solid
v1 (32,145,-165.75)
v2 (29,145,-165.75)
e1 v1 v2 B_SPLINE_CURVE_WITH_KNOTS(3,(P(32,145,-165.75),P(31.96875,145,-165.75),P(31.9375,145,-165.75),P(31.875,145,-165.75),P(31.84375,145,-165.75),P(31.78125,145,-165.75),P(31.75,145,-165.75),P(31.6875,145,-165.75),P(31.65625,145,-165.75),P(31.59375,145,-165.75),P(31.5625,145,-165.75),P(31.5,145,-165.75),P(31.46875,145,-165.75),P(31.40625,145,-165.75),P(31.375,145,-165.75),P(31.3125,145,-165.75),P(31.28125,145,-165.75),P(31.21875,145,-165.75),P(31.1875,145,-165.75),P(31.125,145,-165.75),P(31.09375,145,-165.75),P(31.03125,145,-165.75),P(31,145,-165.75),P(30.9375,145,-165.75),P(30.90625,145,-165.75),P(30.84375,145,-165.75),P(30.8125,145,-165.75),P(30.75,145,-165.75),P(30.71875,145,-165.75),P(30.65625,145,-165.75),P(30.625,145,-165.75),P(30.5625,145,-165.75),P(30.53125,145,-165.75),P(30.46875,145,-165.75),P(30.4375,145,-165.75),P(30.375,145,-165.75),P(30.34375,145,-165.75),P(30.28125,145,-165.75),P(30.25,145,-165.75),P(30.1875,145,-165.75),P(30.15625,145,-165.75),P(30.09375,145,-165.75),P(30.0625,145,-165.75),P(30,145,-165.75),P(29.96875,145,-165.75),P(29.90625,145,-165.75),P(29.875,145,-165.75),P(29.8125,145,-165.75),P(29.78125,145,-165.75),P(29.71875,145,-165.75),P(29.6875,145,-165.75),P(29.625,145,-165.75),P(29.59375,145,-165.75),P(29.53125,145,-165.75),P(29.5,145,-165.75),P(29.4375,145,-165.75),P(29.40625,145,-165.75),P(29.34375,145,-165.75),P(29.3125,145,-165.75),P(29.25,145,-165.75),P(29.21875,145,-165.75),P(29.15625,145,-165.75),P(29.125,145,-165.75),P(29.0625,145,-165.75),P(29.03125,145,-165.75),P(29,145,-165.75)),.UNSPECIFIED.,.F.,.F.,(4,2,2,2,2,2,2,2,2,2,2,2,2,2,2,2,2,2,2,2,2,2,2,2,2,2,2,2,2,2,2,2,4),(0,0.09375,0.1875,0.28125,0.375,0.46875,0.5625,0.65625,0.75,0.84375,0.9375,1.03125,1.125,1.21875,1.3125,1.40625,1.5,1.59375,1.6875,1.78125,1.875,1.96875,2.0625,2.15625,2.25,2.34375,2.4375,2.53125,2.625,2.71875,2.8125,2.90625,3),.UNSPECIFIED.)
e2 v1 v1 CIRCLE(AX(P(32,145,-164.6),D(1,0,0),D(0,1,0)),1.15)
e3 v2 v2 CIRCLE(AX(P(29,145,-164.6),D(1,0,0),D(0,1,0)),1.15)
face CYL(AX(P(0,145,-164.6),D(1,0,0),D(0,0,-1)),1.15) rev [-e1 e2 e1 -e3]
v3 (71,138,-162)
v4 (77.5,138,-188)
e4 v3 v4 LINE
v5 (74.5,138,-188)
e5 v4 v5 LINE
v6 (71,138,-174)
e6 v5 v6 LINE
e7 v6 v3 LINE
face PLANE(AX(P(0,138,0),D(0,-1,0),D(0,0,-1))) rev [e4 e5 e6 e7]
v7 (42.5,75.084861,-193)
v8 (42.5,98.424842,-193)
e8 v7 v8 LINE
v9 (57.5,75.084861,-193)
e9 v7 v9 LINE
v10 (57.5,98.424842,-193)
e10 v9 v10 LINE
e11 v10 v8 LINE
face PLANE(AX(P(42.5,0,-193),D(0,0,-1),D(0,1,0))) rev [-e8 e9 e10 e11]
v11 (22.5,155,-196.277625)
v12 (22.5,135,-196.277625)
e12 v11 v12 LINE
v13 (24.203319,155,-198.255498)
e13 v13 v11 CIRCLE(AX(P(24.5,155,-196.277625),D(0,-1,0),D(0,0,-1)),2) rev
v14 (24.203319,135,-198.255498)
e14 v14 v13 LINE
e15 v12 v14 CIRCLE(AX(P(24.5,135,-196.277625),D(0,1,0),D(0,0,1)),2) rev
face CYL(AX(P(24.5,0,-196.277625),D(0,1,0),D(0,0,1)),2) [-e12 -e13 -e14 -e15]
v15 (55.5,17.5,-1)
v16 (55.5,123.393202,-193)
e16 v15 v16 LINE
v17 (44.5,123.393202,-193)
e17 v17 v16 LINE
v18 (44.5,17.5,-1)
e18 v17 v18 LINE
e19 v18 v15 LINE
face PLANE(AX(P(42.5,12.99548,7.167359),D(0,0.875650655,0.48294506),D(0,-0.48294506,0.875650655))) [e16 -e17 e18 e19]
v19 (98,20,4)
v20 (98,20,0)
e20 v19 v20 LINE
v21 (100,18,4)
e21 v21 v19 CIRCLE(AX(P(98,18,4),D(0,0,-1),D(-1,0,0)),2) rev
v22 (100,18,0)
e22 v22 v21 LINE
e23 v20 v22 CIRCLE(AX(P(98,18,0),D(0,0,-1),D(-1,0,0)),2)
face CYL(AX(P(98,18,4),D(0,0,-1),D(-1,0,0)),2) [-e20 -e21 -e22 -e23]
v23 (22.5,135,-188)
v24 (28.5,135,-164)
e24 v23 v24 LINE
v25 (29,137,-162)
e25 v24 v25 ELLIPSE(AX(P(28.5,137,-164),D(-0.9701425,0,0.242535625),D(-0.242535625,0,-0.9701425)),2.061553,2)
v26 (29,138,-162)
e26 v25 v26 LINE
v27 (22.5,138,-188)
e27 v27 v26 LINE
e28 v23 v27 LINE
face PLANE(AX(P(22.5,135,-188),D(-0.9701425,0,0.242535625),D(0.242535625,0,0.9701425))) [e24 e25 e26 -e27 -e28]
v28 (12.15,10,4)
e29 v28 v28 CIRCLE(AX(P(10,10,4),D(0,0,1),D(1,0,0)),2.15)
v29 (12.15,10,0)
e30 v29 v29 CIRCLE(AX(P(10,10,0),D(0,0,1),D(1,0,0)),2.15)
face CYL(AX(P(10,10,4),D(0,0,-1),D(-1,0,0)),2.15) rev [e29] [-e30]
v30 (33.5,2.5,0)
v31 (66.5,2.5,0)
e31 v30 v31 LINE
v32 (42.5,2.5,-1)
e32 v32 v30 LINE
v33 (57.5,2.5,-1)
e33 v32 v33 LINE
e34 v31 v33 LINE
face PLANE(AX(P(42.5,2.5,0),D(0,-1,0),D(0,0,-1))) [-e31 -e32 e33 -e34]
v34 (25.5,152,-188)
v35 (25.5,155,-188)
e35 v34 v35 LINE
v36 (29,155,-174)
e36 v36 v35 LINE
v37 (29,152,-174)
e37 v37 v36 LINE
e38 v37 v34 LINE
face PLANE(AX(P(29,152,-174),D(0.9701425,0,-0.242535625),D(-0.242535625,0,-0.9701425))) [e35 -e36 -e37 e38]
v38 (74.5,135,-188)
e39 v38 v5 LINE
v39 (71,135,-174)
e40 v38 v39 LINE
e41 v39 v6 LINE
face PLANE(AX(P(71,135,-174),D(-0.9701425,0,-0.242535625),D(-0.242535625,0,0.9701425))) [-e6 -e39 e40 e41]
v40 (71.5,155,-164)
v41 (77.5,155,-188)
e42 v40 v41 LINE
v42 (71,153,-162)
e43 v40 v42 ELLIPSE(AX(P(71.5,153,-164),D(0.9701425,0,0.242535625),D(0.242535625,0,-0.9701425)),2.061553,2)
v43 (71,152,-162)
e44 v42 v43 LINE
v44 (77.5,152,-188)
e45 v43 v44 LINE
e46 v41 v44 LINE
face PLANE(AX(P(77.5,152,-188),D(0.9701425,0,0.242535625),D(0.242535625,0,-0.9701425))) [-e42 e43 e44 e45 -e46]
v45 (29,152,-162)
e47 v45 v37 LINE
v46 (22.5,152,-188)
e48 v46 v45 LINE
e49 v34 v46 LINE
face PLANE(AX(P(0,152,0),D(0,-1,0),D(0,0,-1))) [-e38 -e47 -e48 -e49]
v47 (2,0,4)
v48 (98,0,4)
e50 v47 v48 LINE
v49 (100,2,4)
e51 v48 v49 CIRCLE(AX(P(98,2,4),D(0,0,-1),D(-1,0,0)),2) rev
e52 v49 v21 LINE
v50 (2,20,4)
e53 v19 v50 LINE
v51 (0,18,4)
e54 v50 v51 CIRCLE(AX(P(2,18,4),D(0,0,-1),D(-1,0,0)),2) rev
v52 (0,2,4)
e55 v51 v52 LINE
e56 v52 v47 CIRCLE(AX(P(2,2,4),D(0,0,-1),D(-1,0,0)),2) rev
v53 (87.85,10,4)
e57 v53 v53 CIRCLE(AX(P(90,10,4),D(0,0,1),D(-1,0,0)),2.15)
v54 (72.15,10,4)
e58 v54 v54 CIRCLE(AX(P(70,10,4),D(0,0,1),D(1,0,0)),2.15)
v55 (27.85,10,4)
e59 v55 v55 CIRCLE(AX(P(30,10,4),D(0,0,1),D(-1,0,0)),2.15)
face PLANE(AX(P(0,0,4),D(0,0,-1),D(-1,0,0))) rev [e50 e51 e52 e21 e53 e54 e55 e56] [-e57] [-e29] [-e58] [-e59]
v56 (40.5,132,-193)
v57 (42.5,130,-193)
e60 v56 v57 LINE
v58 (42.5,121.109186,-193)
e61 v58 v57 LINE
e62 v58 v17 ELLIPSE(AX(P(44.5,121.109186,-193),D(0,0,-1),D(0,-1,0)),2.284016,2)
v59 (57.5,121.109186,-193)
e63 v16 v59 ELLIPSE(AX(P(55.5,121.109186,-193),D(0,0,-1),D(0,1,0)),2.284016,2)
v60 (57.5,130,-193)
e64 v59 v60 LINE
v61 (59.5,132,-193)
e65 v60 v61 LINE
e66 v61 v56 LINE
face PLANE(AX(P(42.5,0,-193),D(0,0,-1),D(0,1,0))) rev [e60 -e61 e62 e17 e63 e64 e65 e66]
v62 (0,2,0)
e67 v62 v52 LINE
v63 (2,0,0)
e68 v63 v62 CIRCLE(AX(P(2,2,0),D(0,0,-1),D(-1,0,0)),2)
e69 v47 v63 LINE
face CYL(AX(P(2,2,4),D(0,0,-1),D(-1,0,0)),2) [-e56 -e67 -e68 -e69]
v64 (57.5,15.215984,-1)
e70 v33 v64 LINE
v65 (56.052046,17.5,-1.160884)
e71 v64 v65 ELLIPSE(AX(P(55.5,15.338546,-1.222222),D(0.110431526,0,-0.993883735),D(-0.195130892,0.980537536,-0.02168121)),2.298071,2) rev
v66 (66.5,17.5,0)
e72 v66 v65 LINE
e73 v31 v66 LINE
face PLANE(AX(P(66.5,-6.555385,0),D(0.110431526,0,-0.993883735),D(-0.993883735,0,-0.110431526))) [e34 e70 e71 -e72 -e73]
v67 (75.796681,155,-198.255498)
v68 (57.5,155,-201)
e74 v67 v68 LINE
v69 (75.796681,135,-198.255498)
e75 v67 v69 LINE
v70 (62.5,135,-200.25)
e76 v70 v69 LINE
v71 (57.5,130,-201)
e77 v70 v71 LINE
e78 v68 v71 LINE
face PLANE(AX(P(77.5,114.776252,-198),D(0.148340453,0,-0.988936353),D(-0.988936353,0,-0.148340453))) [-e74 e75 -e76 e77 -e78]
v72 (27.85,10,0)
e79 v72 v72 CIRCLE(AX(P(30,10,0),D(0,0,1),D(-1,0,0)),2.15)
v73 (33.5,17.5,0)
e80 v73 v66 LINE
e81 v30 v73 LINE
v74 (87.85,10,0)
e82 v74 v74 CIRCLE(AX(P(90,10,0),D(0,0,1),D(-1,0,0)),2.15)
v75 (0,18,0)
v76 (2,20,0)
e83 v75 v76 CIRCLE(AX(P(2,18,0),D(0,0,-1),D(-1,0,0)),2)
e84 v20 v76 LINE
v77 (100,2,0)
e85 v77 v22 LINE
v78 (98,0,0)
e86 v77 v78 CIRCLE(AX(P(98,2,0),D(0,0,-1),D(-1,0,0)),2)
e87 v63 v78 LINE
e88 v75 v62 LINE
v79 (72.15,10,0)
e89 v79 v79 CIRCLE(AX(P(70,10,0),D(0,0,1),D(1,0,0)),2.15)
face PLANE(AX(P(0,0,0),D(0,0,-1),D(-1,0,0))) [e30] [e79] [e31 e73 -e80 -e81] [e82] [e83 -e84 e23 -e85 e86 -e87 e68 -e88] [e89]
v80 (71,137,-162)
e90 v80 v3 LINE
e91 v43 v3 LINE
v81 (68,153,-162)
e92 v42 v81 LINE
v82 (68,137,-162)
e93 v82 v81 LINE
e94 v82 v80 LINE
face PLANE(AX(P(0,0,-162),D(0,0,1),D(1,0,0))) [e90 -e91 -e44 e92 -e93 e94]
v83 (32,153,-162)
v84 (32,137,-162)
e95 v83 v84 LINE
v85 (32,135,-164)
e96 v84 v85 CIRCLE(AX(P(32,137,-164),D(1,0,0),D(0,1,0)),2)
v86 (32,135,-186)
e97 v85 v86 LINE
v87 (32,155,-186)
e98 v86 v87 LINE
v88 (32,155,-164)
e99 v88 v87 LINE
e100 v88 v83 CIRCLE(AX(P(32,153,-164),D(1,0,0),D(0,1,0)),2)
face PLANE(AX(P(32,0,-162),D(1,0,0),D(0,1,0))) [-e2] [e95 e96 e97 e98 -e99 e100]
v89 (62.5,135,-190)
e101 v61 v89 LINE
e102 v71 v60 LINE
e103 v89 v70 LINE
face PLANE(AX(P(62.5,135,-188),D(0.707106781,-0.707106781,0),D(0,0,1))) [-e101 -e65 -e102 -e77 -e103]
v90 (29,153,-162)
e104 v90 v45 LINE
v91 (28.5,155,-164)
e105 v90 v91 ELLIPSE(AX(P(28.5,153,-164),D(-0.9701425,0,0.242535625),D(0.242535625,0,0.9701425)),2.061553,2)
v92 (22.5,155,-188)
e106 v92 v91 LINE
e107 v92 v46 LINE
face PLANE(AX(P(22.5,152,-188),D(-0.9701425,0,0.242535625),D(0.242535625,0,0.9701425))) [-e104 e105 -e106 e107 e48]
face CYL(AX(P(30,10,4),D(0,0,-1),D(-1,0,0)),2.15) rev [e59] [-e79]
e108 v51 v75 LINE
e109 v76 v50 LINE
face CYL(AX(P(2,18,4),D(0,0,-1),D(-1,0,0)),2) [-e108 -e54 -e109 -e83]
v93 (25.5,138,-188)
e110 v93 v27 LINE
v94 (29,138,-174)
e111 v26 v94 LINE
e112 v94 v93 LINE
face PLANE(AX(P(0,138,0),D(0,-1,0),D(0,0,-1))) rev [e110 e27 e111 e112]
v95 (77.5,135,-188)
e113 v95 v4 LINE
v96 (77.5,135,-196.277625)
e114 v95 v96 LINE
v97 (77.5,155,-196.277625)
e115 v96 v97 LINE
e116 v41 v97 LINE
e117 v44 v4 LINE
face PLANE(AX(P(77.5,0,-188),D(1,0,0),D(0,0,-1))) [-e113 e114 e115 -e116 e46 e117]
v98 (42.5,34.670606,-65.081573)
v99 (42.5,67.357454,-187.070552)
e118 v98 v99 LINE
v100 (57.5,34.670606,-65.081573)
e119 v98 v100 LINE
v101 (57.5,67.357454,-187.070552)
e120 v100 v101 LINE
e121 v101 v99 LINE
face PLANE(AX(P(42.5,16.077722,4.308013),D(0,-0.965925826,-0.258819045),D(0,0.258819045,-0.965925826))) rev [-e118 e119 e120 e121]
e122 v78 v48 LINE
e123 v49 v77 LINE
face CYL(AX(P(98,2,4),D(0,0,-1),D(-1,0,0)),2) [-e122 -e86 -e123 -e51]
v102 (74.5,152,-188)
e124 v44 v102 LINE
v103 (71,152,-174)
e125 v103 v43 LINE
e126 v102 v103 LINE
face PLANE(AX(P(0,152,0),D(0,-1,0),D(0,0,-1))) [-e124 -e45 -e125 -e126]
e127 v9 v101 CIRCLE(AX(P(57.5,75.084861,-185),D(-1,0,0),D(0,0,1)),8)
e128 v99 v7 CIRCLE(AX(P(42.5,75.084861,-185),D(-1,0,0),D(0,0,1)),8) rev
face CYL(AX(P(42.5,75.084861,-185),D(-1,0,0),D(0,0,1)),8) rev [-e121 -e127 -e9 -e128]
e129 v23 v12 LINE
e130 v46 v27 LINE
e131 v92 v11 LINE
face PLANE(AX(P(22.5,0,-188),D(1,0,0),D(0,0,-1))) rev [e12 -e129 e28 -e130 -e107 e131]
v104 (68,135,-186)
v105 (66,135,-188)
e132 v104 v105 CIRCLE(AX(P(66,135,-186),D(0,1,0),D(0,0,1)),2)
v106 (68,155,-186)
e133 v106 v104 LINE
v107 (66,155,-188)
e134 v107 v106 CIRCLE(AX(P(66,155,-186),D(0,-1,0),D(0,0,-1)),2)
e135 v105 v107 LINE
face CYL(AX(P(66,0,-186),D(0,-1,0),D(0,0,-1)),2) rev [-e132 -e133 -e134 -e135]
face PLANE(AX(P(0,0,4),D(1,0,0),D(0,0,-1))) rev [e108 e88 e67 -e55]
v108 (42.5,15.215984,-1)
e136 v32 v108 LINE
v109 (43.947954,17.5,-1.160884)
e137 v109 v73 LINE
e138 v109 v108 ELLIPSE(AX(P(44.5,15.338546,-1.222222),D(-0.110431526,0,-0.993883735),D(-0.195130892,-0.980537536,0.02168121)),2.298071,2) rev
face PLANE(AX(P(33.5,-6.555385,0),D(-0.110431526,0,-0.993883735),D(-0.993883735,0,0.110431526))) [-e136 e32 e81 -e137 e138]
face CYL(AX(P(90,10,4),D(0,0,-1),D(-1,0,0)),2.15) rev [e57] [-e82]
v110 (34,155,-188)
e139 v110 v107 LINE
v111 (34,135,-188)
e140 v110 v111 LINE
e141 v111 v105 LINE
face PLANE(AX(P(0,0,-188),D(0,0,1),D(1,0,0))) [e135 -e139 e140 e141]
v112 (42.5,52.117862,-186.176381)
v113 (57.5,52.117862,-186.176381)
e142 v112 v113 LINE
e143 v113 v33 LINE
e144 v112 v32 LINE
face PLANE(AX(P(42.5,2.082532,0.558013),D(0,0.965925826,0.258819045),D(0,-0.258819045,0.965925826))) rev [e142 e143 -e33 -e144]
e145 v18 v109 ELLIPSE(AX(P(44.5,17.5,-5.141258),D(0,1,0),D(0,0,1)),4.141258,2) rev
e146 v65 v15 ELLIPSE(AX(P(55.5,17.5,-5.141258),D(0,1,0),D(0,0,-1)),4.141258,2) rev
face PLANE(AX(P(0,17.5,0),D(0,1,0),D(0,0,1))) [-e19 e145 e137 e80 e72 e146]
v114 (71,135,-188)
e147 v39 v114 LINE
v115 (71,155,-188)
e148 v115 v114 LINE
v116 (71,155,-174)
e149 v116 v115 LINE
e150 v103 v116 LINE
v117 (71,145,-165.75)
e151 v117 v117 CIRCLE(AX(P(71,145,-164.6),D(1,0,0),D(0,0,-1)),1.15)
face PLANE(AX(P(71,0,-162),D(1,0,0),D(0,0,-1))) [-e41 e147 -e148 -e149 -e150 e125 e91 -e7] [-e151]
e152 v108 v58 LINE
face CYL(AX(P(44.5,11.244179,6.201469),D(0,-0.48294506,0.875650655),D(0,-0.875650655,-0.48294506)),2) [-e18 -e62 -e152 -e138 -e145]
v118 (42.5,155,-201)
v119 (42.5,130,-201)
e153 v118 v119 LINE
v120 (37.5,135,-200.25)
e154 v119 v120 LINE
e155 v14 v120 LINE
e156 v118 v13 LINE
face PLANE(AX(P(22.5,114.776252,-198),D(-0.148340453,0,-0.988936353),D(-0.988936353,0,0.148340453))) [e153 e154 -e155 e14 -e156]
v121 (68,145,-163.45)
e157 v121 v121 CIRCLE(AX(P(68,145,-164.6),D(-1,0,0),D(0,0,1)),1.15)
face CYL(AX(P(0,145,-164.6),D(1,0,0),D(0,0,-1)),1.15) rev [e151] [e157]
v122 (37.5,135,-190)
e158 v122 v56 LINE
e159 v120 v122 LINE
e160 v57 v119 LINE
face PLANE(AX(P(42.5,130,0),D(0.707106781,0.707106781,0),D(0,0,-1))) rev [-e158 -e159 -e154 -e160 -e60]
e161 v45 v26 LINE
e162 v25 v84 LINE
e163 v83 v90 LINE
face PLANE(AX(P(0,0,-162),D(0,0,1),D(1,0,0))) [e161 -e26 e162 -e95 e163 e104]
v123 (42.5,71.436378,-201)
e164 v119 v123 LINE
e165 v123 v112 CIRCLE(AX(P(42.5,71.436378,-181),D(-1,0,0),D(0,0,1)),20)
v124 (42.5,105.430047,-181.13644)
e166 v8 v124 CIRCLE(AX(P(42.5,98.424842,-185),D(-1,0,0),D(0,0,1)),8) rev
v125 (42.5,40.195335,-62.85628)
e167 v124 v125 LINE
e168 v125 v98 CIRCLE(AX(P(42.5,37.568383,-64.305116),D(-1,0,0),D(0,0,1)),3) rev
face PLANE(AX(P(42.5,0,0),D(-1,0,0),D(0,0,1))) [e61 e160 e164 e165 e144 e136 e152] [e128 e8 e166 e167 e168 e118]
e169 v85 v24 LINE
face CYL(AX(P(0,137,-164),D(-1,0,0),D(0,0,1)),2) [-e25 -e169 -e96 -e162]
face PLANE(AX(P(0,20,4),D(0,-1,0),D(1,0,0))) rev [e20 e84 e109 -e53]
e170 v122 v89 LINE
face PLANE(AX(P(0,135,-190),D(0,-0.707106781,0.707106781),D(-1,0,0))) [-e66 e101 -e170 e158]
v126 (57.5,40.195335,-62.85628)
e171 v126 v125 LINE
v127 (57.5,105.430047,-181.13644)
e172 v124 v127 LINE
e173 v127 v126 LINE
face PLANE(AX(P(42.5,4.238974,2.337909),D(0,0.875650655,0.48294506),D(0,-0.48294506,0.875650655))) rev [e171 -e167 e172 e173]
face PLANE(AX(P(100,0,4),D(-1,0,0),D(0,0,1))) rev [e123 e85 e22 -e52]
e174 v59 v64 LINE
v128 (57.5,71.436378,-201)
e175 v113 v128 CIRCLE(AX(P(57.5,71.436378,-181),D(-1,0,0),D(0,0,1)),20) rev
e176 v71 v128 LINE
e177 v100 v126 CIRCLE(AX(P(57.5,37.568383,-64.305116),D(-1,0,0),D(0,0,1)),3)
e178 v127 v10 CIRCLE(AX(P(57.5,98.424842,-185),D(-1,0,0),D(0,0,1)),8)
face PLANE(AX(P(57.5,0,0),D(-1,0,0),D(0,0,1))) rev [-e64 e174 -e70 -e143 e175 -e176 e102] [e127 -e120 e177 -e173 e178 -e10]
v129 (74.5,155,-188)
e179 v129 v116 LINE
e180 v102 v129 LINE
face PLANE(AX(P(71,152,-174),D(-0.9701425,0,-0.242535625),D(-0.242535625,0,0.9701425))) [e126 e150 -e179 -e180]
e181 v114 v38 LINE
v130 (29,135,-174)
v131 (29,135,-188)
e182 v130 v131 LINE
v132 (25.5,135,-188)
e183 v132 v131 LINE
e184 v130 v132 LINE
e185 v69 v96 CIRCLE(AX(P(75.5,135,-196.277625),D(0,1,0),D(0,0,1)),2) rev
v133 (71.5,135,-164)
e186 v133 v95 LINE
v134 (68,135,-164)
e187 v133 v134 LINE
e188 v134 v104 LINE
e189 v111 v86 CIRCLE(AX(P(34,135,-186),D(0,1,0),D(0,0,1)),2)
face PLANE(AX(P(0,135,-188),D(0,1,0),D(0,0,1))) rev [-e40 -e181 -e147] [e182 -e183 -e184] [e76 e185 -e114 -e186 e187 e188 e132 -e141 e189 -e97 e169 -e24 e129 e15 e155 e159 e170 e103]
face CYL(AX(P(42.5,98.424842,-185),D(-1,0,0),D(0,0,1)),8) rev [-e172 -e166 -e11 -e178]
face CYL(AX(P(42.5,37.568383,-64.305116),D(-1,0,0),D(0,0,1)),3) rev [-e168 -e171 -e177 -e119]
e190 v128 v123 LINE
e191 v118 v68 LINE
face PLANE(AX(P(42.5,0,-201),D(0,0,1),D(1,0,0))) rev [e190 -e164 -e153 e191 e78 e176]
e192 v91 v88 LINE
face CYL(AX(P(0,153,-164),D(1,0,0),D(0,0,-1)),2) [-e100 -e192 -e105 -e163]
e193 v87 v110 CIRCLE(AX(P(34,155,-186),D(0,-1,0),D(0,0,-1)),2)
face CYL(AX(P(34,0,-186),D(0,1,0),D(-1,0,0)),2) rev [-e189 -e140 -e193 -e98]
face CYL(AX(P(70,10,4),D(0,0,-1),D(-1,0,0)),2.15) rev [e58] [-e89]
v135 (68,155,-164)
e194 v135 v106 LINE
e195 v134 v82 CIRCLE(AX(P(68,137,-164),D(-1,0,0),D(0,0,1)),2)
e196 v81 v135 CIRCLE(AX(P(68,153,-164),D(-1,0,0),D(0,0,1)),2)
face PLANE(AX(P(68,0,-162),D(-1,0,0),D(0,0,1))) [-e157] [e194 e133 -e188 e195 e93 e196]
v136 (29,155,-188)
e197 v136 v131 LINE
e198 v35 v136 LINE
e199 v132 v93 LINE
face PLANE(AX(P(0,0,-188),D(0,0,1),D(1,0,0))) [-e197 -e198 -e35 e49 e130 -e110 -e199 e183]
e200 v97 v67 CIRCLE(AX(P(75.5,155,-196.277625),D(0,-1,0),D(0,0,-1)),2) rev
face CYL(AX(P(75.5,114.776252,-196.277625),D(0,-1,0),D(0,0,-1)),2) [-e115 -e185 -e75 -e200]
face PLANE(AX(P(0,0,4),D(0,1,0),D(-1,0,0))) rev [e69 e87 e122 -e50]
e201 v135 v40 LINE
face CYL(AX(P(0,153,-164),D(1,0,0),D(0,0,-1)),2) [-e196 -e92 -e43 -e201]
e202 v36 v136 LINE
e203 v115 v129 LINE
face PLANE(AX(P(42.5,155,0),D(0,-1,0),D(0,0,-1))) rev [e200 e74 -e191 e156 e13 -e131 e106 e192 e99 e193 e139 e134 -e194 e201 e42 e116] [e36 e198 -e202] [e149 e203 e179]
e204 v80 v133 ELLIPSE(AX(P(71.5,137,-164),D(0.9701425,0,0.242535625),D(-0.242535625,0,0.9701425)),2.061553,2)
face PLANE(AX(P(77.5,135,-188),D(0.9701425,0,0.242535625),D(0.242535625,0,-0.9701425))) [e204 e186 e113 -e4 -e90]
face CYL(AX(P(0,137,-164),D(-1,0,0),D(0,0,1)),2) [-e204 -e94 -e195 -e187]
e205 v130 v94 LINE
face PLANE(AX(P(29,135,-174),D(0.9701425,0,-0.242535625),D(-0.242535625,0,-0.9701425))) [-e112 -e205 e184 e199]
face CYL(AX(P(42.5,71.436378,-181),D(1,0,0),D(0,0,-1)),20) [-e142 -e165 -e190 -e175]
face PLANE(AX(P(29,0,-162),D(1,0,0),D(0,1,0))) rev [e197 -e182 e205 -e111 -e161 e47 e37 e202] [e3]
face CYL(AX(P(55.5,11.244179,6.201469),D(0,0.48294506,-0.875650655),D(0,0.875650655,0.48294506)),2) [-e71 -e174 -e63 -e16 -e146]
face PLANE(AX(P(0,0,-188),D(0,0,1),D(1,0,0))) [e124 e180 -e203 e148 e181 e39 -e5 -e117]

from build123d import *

# Parameters (mm, degrees)
SKETCH1_W           = 100
SKETCH1_H           = 20
SKETCH1_R           = 2.15
BOSS_EXTRUDE1_DEPTH = 4
BOSS_EXTRUDE2_DEPTH = 7.5
FILLET1_R           = 8
FILLET2_R           = 3
FILLET3_R           = 20
SKETCH5_W           = 9.5
SKETCH5_H           = 20
SKETCH5_W_2         = 10.5
SKETCH5_W_3         = 7.5
BOSS_EXTRUDE3_DEPTH = 5
SKETCH6_W           = 3
SKETCH6_H           = 20
BOSS_EXTRUDE4_DEPTH = 26
BOSS_EXTRUDE5_DEPTH = 3
LPATTERN2_COUNT     = 2
LPATTERN2_PITCH     = 17
SKETCH9_R           = 1.15
CUT_EXTRUDE1_DEPTH  = 264.565931031
BOSS_EXTRUDE6_DEPTH = 20
FILLET4_R           = 2
CHAMFER1_SIZE       = 3
CHAMFER2_SIZE       = 5
FILLET5_R           = 2
FILLET6_R           = 2
BOSS_EXTRUDE7_DEPTH = 15
FILLET7_R           = 2


with BuildPart() as part:
    # Sketch1 → Boss-Extrude1 (new body)
    with BuildSketch(Plane.XY):
        with Locations((50, 10)):
            Rectangle(SKETCH1_W, SKETCH1_H)
        with Locations((70, 10)):
            Circle(SKETCH1_R, mode=Mode.SUBTRACT)
        with Locations(Location((30, 10, 0), (0, 0, 180))):
            Circle(SKETCH1_R, mode=Mode.SUBTRACT)
        with Locations((10, 10)):
            Circle(SKETCH1_R, mode=Mode.SUBTRACT)
        with Locations(Location((90, 10, 0), (0, 0, 180))):
            Circle(SKETCH1_R, mode=Mode.SUBTRACT)
    extrude(amount=BOSS_EXTRUDE1_DEPTH)

    # Fillet6
    fillet6_edges = [part.edges().sort_by_distance(p)[0] for p in [
        (0, 20, 2),
        (100, 20, 2),
        (100, 0, 2),
        (0, 0, 2),
    ]]
    fillet(fillet6_edges, radius=FILLET6_R)



with BuildPart() as body_2:
    # Sketch4 → Boss-Extrude2 (new, symmetric)
    with BuildSketch(Plane.ZY.offset(-50)):
        Polygon((0, 2.5), (0, 17.5), (-1, 17.5), (-193, 123.393201871), (-193, 155), (-201, 155), (-201, 56.089838486), (-1, 2.5), align=None)
        Polygon((-41.271401161, 28.290689419), (-193, 68.946244947), (-193, 111.973122473), align=None, mode=Mode.SUBTRACT)
    extrude(amount=BOSS_EXTRUDE2_DEPTH, both=True)

    # Fillet1
    fillet1_edges = [body_2.edges().sort_by_distance(p)[0] for p in [
        (50, 111.973122473, -193),
        (50, 68.946244947, -193),
    ]]
    fillet(fillet1_edges, radius=FILLET1_R)

    # Fillet2
    fillet2_edges = [body_2.edges().sort_by_distance(p)[0] for p in [
        (50, 28.290689419, -41.271401161),
    ]]
    fillet(fillet2_edges, radius=FILLET2_R)

    # Fillet3
    fillet3_edges = [body_2.edges().sort_by_distance(p)[0] for p in [
        (50, 56.089838486, -201),
    ]]
    fillet(fillet3_edges, radius=FILLET3_R)

    # Sketch5 → Boss-Extrude3 (add, symmetric)
    with BuildSketch(Plane.XY.offset(-193)):
        with Locations((27.25, 145)):
            Rectangle(SKETCH5_W, SKETCH5_H)
        with Locations((37.25, 145)):
            Rectangle(SKETCH5_W_2, SKETCH5_H)
        with Locations((46.25, 145)):
            Rectangle(SKETCH5_W_3, SKETCH5_H)
        with Locations((53.75, 145)):
            Rectangle(SKETCH5_W_3, SKETCH5_H)
        with Locations((62.75, 145)):
            Rectangle(SKETCH5_W_2, SKETCH5_H)
        with Locations((72.75, 145)):
            Rectangle(SKETCH5_W, SKETCH5_H)
    extrude(amount=BOSS_EXTRUDE3_DEPTH, both=True)

    # Sketch6 → Boss-Extrude4 (add)
    with BuildSketch(Plane.XY.offset(-188)):
        with Locations((30.5, 145)):
            Rectangle(SKETCH6_W, SKETCH6_H)
        with Locations((69.5, 145)):
            Rectangle(SKETCH6_W, SKETCH6_H)
    extrude(amount=BOSS_EXTRUDE4_DEPTH)

    # Sketch8 → Boss-Extrude5 (add)
    with BuildSketch(Plane(origin=(0, 155, 0), x_dir=(1, 0, 0), z_dir=(0, 1, 0))):
        Polygon((22.5, 188), (29, 162), (29, 174), (25.5, 188), align=None)
        Polygon((74.5, 188), (77.5, 188), (71, 162), (71, 174), align=None)
    boss_extrude5 = extrude(amount=-BOSS_EXTRUDE5_DEPTH)

    # LPattern2: Boss-Extrude5 ×2
    with Locations(*[(0, -i * LPATTERN2_PITCH, 0) for i in range(1, LPATTERN2_COUNT)]):
        add(boss_extrude5)

    # Sketch9 → Cut-Extrude1 (cut, through all)
    with BuildSketch(Plane(origin=(71, 0, 0), x_dir=(0, 0, -1), z_dir=(1, 0, 0))):
        with Locations((164.6, 145)):
            Circle(SKETCH9_R)
    extrude(amount=-CUT_EXTRUDE1_DEPTH, mode=Mode.SUBTRACT)

    # Sketch10 → Boss-Extrude6 (add)
    with BuildSketch(Plane(origin=(0, 155, 0), x_dir=(1, 0, 0), z_dir=(0, 1, 0))):
        Polygon((57.5, 201), (57.5, 198), (77.5, 198), align=None)
        Polygon((42.5, 201), (42.5, 198), (22.5, 198), align=None)
    extrude(amount=-BOSS_EXTRUDE6_DEPTH)

    # Fillet4
    fillet4_edges = [body_2.edges().sort_by_distance(p)[0] for p in [
        (32, 145, -188),
        (68, 145, -188),
        (77.5, 145, -198),
        (22.5, 145, -198),
    ]]
    fillet(fillet4_edges, radius=FILLET4_R)

    # Chamfer1
    chamfer1_edges = [body_2.edges().sort_by_distance(p)[0] for p in [
        (50, 135, -193),
    ]]
    chamfer(chamfer1_edges, length=CHAMFER1_SIZE)

    # Chamfer2
    # the kernel refuses this chamfer: 5 mm, written as the material it adds along each edge
    with BuildSketch(Plane(origin=(57.5, 135, -177.14158506), x_dir=(0.9996219169112968, 0.0274958766105877, 0), z_dir=(0, 0, -1))) as chamfer2_piece_1_section:
        Polygon((CHAMFER2_SIZE * 0.999621916911, CHAMFER2_SIZE * 0.0274958766106), (-CHAMFER2_SIZE * 0.0274958766106, CHAMFER2_SIZE * 0.999621916911), (0, 0), align=None)
    chamfer2_piece_1 = extrude(amount=23.85841494, mode=Mode.PRIVATE)
    chamfer2_piece_1 = split(chamfer2_piece_1, bisect_by=Plane(origin=(57.857106813, 131.163616626, -193.836383374), z_dir=(0, -0.7071067811865476, 0.7071067811865476)), keep=Keep.TOP, mode=Mode.PRIVATE)
    chamfer2_piece_1 = split(chamfer2_piece_1, bisect_by=Plane(origin=(57.857106813, 130.884822168, -193), z_dir=(0, 0, -1)), keep=Keep.TOP, mode=Mode.PRIVATE)
    add(chamfer2_piece_1)
    with BuildSketch(Plane(origin=(57.5, 135, -177.14158506), x_dir=(0.9996219169112968, 0.0274958766105877, 0), z_dir=(0, 0, -1))) as chamfer2_piece_2_section:
        Polygon((CHAMFER2_SIZE * 0.999621916911, CHAMFER2_SIZE * 0.0274958766106), (-CHAMFER2_SIZE * 0.0274958766106, CHAMFER2_SIZE * 0.999621916911), (0, 0), align=None)
    chamfer2_piece_2 = extrude(amount=23.85841494, mode=Mode.PRIVATE)
    chamfer2_piece_2 = split(chamfer2_piece_2, bisect_by=Plane(origin=(59.611963913, 133.659604806, -191.340395194), z_dir=(0, 0.7071067811865476, -0.7071067811865476)), keep=Keep.TOP, mode=Mode.PRIVATE)
    chamfer2_piece_2 = split(chamfer2_piece_2, bisect_by=Plane(origin=(59.611963913, 134.212806408, -193), z_dir=(0, 0, 1)), keep=Keep.TOP, mode=Mode.PRIVATE)
    add(chamfer2_piece_2)
    with BuildSketch(Plane(origin=(57.5, 135, -177.14158506), x_dir=(0.9996219169112968, 0.0274958766105877, 0), z_dir=(0, 0, -1))) as chamfer2_piece_3_section:
        Polygon((CHAMFER2_SIZE * 0.999621916911, CHAMFER2_SIZE * 0.0274958766106), (-CHAMFER2_SIZE * 0.0274958766106, CHAMFER2_SIZE * 0.999621916911), (0, 0), align=None)
    chamfer2_piece_3 = extrude(amount=23.85841494, mode=Mode.PRIVATE)
    chamfer2_piece_3 = split(chamfer2_piece_3, bisect_by=Plane(origin=(59.139397436, 130.720913617, -194.279086383), z_dir=(0, 0.7071067811865476, -0.7071067811865476)), keep=Keep.TOP, mode=Mode.PRIVATE)
    chamfer2_piece_3 = split(chamfer2_piece_3, bisect_by=Plane(origin=(59.699836307, 133.375592649, -200.670024554), z_dir=(-0.14834045293024603, 0, 0.9889363528682974)), keep=Keep.TOP, mode=Mode.PRIVATE)
    chamfer2_piece_3 = split(chamfer2_piece_3, bisect_by=Plane(origin=(59.139397436, 133.375592649, -193), z_dir=(0, 0, -1)), keep=Keep.TOP, mode=Mode.PRIVATE)
    add(chamfer2_piece_3)
    with BuildSketch(Plane(origin=(42.5, 135, -201), x_dir=(-0.9996219169112968, 0.0274958766105877, 0), z_dir=(0, 0, 1))) as chamfer2_piece_4_section:
        Polygon((CHAMFER2_SIZE * 0.999621916911, CHAMFER2_SIZE * 0.0274958766106), (-CHAMFER2_SIZE * 0.0274958766106, CHAMFER2_SIZE * 0.999621916911), (0, 0), align=None)
    chamfer2_piece_4 = extrude(amount=23.85841494, mode=Mode.PRIVATE)
    chamfer2_piece_4 = split(chamfer2_piece_4, bisect_by=Plane(origin=(40.860602564, 130.720913617, -194.279086383), z_dir=(0, 0.7071067811865476, -0.7071067811865476)), keep=Keep.TOP, mode=Mode.PRIVATE)
    chamfer2_piece_4 = split(chamfer2_piece_4, bisect_by=Plane(origin=(40.300163693, 133.375592649, -200.670024554), z_dir=(0.1483404529302461, 0, 0.9889363528682974)), keep=Keep.TOP, mode=Mode.PRIVATE)
    chamfer2_piece_4 = split(chamfer2_piece_4, bisect_by=Plane(origin=(40.860602564, 133.375592649, -193), z_dir=(0, 0, -1)), keep=Keep.TOP, mode=Mode.PRIVATE)
    add(chamfer2_piece_4)
    with BuildSketch(Plane(origin=(42.5, 135, -201), x_dir=(-0.9996219169112968, 0.0274958766105877, 0), z_dir=(0, 0, 1))) as chamfer2_piece_5_section:
        Polygon((CHAMFER2_SIZE * 0.999621916911, CHAMFER2_SIZE * 0.0274958766106), (-CHAMFER2_SIZE * 0.0274958766106, CHAMFER2_SIZE * 0.999621916911), (0, 0), align=None)
    chamfer2_piece_5 = extrude(amount=23.85841494, mode=Mode.PRIVATE)
    chamfer2_piece_5 = split(chamfer2_piece_5, bisect_by=Plane(origin=(42.142893187, 131.163616626, -193.836383374), z_dir=(0, -0.7071067811865476, 0.7071067811865476)), keep=Keep.TOP, mode=Mode.PRIVATE)
    chamfer2_piece_5 = split(chamfer2_piece_5, bisect_by=Plane(origin=(42.142893187, 130.884822168, -193), z_dir=(0, 0, -1)), keep=Keep.TOP, mode=Mode.PRIVATE)
    add(chamfer2_piece_5)
    with BuildSketch(Plane(origin=(42.5, 135, -201), x_dir=(-0.9996219169112968, 0.0274958766105877, 0), z_dir=(0, 0, 1))) as chamfer2_piece_6_section:
        Polygon((CHAMFER2_SIZE * 0.999621916911, CHAMFER2_SIZE * 0.0274958766106), (-CHAMFER2_SIZE * 0.0274958766106, CHAMFER2_SIZE * 0.999621916911), (0, 0), align=None)
    chamfer2_piece_6 = extrude(amount=23.85841494, mode=Mode.PRIVATE)
    chamfer2_piece_6 = split(chamfer2_piece_6, bisect_by=Plane(origin=(40.388036087, 133.659604806, -191.340395194), z_dir=(0, 0.7071067811865476, -0.7071067811865476)), keep=Keep.TOP, mode=Mode.PRIVATE)
    chamfer2_piece_6 = split(chamfer2_piece_6, bisect_by=Plane(origin=(40.388036087, 134.212806408, -193), z_dir=(0, 0, 1)), keep=Keep.TOP, mode=Mode.PRIVATE)
    add(chamfer2_piece_6)

    # Fillet5
    fillet5_edges = [body_2.edges().sort_by_distance(p)[0] for p in [
        (30.5, 155, -162),
        (30.5, 135, -162),
        (69.5, 155, -162),
        (69.5, 135, -162),
    ]]
    fillet(fillet5_edges, radius=FILLET5_R)


with BuildPart() as part_1:
    add(part.part)

    add(body_2.part)  # Boss-Extrude7 merges body 2
    # Sketch11 → Boss-Extrude7 (add)
    with BuildSketch(Plane(origin=(0, 17.5, 0), x_dir=(1, 0, 0), z_dir=(0, 1, 0))):
        Polygon((57.5, 1), (57.5, 0), (66.5, 0), align=None)
        Polygon((42.5, 1), (42.5, 0), (33.5, 0), align=None)
    extrude(amount=-BOSS_EXTRUDE7_DEPTH)

    # Fillet7
    fillet7_edges = [part_1.edges().sort_by_distance(p)[0] for p in [
        (57.5, 70.446600935, -97),
        (42.5, 70.446600935, -97),
    ]]
    fillet(fillet7_edges, radius=FILLET7_R)


solid = part_1.part
